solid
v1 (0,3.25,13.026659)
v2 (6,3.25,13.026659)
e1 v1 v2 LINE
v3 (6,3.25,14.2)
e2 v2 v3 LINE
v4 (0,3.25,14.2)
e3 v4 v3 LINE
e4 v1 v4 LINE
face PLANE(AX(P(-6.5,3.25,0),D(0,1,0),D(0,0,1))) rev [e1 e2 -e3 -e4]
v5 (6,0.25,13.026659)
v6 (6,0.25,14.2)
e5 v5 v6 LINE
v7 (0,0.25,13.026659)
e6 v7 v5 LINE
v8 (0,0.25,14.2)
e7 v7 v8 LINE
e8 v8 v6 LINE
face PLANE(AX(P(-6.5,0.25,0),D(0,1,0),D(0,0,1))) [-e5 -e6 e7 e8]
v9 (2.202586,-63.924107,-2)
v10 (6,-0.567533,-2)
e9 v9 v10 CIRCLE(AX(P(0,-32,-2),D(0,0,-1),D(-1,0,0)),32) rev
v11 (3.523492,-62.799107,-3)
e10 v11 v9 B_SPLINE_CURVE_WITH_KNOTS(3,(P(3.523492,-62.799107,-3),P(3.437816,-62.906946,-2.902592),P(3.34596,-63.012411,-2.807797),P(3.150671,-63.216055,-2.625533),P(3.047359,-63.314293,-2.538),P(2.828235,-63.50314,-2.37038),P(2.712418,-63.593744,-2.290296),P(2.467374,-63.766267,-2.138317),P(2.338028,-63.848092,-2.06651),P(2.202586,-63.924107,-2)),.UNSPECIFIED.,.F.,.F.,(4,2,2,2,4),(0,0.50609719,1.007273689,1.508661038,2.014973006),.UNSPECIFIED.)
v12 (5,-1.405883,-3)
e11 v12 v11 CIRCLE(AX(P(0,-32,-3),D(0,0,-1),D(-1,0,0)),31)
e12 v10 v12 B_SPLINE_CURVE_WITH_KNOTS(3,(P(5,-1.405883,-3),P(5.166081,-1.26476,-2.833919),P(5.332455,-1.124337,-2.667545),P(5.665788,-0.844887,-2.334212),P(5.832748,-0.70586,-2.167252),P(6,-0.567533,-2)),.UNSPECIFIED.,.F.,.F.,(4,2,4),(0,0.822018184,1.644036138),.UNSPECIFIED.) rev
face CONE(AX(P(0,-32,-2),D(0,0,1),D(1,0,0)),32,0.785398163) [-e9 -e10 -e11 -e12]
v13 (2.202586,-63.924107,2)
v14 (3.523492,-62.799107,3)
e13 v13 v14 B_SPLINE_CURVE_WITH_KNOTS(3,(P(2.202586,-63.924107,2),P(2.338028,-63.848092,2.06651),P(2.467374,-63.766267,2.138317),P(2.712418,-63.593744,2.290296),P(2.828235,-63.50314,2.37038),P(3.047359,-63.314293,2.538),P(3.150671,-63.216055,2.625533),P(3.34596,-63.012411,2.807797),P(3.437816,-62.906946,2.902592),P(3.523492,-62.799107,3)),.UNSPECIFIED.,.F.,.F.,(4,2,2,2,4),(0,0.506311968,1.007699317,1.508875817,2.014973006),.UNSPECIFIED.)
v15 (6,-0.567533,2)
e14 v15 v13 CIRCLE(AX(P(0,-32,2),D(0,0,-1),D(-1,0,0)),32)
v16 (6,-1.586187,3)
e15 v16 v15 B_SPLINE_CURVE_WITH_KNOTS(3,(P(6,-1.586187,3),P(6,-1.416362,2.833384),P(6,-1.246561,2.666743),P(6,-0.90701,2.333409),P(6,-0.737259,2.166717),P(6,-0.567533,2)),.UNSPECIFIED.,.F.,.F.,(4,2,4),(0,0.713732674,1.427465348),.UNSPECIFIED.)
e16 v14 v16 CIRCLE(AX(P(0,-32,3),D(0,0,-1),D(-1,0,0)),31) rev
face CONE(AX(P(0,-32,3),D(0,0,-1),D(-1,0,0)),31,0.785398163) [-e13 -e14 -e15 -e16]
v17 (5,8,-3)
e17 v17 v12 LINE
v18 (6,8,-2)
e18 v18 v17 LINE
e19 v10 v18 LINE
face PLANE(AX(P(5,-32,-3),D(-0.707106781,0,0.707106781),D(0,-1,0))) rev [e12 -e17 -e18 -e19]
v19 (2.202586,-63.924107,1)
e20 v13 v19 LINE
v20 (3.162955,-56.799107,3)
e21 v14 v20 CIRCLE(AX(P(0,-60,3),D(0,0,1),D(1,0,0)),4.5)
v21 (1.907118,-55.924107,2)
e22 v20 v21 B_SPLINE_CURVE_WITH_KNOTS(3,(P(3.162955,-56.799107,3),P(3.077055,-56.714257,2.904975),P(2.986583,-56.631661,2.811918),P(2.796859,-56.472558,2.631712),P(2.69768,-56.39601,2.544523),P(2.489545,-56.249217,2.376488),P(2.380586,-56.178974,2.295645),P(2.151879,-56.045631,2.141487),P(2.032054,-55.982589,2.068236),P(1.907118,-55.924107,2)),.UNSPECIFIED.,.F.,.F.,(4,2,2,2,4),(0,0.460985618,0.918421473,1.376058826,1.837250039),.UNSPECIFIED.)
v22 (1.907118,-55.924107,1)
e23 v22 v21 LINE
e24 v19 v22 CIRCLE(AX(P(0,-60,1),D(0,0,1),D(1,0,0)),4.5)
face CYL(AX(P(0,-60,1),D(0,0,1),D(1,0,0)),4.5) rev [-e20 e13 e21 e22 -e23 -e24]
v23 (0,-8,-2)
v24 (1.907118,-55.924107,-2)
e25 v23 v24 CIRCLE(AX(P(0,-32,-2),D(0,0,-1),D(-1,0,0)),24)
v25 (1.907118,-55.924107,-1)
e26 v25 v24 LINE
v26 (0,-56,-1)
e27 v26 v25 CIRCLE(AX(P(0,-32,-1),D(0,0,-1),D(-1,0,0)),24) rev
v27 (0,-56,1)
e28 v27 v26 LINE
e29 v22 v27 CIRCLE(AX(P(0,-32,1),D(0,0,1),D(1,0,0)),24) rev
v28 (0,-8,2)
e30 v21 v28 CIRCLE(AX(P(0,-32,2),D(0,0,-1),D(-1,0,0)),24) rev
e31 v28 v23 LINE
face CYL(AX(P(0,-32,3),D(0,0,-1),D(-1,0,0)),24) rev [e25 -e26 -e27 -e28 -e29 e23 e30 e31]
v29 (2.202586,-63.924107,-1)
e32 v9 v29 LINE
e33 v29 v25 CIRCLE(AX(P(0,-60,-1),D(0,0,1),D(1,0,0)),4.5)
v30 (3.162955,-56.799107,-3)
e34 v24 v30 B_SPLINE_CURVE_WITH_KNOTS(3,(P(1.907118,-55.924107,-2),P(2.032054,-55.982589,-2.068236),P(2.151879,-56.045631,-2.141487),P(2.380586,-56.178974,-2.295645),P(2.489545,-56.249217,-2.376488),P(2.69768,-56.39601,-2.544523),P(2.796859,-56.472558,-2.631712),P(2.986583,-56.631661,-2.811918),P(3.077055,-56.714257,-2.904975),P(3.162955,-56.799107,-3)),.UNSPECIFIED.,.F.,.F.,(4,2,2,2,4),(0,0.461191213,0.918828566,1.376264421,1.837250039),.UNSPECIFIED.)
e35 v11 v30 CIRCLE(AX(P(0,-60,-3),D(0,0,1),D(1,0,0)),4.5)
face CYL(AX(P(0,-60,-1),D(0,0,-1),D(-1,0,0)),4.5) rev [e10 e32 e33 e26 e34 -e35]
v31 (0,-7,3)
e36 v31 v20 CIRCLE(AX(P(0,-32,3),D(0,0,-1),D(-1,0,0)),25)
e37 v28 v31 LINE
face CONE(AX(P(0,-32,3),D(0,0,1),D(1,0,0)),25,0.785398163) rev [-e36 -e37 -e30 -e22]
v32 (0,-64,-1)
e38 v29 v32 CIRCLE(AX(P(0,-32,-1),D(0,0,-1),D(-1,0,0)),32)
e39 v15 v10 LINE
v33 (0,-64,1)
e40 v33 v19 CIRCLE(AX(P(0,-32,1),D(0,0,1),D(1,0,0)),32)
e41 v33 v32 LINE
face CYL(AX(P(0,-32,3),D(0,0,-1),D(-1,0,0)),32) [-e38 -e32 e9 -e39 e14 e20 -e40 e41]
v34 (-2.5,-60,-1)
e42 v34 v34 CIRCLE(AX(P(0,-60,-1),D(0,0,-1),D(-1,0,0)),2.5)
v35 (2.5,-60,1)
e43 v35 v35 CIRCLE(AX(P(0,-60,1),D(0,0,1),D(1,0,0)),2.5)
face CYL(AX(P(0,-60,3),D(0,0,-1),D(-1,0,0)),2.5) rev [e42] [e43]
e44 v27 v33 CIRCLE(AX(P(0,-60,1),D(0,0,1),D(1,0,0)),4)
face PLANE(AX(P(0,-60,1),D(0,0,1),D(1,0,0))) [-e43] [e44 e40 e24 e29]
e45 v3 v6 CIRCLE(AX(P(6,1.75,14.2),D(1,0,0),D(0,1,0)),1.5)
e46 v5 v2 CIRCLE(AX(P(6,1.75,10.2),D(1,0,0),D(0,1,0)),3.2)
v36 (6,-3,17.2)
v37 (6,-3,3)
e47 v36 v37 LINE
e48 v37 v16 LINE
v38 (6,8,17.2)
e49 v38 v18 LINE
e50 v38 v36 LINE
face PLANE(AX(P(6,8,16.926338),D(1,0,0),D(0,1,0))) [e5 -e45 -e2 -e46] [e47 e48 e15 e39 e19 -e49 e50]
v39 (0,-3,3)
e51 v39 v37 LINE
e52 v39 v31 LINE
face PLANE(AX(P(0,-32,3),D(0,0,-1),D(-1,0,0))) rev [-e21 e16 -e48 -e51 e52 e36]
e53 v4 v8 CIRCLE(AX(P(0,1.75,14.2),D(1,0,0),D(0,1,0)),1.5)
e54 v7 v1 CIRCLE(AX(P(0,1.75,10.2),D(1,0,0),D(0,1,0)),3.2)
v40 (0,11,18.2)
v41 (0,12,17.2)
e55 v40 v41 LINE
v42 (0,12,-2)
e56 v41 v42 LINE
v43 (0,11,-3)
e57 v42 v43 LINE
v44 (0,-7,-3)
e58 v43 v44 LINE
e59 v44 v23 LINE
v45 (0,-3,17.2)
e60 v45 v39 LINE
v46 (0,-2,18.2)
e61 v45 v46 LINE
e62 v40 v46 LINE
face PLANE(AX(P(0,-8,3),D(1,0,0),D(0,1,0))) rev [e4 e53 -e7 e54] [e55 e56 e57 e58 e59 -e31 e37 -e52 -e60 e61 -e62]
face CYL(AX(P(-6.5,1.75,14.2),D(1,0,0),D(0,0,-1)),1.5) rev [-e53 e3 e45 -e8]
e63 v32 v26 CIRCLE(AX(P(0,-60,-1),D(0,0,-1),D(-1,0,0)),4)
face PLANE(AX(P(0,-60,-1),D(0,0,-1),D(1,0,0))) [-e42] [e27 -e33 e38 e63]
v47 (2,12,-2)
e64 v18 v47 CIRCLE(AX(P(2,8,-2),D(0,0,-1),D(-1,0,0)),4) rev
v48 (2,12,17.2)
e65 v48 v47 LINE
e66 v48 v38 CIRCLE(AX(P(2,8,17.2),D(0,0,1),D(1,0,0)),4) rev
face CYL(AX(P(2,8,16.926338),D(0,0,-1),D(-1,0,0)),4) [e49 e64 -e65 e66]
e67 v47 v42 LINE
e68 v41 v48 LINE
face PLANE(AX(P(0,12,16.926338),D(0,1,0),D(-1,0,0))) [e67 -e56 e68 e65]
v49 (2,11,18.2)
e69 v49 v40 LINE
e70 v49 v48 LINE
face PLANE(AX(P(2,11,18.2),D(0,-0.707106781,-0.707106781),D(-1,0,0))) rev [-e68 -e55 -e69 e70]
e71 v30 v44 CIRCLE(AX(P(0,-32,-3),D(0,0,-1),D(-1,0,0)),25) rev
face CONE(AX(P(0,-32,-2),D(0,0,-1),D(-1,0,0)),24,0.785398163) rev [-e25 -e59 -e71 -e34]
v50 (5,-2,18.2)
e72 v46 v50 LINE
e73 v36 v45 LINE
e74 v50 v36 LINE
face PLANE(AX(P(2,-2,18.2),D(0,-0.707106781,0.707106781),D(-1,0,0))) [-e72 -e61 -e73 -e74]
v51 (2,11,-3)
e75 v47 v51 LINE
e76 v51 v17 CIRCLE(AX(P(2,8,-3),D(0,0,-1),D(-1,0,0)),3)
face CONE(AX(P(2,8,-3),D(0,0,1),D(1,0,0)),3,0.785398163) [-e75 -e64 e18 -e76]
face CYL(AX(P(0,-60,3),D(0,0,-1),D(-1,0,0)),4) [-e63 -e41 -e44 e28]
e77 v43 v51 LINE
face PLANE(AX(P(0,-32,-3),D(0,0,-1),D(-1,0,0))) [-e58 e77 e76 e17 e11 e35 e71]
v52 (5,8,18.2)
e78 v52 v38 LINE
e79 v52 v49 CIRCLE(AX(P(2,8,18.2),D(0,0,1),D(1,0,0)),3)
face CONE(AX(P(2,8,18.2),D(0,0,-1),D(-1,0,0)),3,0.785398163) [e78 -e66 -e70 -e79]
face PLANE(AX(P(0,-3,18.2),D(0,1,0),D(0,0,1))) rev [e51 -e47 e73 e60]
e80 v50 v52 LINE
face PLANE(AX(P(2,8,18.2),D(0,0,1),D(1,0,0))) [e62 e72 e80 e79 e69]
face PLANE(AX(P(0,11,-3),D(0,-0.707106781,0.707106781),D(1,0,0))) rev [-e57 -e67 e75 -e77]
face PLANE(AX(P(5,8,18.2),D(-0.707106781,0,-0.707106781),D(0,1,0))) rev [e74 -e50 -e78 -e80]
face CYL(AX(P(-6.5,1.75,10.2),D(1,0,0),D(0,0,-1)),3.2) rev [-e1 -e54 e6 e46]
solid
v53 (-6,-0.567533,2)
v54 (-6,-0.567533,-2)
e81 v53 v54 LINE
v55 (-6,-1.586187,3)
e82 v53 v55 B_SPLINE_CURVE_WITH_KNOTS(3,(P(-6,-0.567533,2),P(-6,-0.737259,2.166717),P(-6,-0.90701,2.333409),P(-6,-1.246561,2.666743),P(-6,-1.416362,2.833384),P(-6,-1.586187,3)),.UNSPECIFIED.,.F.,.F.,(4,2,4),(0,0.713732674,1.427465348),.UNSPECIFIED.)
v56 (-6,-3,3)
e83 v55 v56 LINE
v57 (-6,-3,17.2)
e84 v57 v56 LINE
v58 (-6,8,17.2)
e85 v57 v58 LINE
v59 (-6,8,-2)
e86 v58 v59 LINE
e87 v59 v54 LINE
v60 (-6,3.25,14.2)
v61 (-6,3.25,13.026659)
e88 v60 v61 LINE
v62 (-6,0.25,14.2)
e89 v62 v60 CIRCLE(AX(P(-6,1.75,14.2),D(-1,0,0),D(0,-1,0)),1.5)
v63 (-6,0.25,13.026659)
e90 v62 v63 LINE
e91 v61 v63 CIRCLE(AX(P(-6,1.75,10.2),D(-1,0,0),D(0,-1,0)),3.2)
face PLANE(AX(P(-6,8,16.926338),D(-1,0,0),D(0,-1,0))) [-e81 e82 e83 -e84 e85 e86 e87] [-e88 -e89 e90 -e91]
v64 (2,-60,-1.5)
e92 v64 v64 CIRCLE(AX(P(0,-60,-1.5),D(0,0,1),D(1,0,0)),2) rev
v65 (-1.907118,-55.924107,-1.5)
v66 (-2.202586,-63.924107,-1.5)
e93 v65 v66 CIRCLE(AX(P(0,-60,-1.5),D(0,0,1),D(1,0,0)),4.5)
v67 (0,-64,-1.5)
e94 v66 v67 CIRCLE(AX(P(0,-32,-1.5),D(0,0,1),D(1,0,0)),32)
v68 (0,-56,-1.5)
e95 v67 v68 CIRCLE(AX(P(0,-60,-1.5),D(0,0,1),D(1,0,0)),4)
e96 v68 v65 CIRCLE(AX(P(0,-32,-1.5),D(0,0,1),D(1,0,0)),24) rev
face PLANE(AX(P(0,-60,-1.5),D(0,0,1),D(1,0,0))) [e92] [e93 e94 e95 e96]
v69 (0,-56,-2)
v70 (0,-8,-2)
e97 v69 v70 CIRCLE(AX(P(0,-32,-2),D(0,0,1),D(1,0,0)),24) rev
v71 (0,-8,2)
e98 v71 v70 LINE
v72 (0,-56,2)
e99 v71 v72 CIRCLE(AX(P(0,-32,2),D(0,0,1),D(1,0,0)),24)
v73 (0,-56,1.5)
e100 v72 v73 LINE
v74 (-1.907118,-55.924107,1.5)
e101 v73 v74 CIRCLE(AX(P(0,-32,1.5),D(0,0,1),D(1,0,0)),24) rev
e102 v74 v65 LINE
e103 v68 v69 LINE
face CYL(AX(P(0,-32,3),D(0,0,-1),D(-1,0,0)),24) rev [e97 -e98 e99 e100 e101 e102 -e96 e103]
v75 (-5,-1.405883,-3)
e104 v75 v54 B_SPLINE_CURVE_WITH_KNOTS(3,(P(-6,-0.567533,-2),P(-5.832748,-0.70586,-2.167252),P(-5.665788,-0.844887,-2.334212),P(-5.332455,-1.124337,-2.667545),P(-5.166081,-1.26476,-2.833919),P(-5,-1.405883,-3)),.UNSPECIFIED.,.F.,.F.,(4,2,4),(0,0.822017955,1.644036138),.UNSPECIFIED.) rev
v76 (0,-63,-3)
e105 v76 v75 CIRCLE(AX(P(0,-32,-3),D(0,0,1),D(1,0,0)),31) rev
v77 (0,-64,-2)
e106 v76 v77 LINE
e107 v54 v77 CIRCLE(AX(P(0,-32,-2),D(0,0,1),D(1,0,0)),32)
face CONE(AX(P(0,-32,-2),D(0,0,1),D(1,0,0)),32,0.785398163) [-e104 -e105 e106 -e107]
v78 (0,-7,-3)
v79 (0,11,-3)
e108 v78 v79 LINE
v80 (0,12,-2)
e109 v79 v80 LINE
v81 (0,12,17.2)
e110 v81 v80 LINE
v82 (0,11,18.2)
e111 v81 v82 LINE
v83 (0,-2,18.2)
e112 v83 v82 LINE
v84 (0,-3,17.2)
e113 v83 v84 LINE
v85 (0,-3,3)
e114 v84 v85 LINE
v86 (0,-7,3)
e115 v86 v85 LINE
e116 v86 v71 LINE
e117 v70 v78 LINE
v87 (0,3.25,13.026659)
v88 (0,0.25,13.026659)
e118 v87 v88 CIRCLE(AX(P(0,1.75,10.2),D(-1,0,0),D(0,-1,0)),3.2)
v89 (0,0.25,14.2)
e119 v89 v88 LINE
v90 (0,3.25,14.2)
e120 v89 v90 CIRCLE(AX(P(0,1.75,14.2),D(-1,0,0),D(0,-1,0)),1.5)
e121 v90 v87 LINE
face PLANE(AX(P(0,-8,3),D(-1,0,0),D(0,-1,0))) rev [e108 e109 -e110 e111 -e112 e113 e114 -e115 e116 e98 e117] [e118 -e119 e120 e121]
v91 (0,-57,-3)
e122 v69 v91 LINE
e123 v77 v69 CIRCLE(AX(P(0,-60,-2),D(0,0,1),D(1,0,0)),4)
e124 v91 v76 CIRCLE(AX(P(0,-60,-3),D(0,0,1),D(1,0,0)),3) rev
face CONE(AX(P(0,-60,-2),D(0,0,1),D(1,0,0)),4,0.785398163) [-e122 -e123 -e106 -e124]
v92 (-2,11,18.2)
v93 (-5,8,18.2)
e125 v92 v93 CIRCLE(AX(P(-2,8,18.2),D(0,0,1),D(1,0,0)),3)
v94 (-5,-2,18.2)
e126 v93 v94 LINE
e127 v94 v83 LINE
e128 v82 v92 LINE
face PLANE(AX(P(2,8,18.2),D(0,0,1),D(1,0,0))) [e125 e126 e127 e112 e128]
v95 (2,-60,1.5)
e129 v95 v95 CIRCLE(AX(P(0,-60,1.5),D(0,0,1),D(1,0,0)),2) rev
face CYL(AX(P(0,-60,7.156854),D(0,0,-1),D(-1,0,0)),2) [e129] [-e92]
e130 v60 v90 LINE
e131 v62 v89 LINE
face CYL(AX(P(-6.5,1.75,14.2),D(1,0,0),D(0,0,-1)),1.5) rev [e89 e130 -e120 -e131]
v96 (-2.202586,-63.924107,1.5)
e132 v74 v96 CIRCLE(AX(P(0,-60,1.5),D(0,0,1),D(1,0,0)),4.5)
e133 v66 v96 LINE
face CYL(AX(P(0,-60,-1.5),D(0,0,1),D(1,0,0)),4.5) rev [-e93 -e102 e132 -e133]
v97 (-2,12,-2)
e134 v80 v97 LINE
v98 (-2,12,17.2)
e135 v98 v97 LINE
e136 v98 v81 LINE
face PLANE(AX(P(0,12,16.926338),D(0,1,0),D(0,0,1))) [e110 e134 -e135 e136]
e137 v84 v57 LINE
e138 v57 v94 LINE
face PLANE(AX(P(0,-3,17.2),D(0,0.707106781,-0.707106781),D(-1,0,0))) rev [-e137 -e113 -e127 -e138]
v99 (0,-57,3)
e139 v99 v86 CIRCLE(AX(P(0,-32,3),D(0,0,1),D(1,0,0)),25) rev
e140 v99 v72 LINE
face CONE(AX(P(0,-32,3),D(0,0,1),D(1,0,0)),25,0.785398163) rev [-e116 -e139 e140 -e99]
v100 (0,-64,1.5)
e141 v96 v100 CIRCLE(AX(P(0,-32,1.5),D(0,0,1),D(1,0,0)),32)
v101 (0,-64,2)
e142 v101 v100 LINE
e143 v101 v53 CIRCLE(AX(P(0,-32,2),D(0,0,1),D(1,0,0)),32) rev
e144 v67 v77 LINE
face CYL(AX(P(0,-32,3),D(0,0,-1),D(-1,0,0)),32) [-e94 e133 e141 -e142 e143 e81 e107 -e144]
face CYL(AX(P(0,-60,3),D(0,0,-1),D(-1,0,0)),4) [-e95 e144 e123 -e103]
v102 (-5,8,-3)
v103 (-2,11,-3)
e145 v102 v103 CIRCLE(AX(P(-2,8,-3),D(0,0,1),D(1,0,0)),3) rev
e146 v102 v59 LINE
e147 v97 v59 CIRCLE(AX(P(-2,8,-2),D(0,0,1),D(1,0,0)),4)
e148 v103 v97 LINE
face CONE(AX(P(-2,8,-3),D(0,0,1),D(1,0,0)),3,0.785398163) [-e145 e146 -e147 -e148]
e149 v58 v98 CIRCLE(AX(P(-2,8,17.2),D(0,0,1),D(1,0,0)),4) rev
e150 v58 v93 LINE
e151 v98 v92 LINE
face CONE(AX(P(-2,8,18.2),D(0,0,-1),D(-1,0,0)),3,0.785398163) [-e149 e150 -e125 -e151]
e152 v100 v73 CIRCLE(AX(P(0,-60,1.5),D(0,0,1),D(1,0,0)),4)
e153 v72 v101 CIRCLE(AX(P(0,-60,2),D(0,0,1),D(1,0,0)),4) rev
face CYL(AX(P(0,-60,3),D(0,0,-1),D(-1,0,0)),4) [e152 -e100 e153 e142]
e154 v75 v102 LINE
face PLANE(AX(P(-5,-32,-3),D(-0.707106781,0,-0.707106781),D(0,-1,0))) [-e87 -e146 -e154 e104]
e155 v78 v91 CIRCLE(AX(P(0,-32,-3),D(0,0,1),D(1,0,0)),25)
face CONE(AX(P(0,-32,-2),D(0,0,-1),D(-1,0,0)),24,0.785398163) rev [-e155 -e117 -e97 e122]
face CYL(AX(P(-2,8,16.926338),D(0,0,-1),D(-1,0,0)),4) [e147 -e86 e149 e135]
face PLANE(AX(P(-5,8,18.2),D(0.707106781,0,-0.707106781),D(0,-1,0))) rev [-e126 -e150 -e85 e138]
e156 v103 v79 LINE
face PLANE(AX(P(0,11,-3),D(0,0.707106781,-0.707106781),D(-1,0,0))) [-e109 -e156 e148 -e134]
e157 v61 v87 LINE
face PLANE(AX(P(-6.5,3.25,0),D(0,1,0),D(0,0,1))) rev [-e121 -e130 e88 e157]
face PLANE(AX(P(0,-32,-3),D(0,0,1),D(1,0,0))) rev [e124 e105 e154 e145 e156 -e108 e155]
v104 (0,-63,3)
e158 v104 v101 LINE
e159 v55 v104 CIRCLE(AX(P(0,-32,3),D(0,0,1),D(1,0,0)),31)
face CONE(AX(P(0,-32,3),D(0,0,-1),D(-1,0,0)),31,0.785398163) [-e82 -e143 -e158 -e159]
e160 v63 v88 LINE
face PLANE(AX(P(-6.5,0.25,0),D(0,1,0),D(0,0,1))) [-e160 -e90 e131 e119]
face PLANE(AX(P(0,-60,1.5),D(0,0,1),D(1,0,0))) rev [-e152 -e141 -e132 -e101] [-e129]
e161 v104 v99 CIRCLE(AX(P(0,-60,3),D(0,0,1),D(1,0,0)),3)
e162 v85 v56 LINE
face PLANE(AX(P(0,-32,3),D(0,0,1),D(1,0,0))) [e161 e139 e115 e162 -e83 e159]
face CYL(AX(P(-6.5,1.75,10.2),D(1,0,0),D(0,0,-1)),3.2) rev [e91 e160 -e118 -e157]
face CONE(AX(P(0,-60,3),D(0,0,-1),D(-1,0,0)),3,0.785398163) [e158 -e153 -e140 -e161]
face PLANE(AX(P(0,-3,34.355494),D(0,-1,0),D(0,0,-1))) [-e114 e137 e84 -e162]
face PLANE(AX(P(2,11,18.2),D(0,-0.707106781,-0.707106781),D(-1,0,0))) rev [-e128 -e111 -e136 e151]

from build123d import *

# Parameters (mm, degrees)
AUFSATZ_LINEAR_AUSTRAGEN1_DEPTH             = 3
SKIZZE2_R                                   = 4.5
SCHNITT_LINEAR_AUSTRAGEN1_DEPTH             = 1.5
AUFSATZ_LINEAR_AUSTRAGEN2_REACH             = 73.617
SKIZZE3_R                                   = 2
AUFSATZ_LINEAR_AUSTRAGEN2_DIRECTION_2_REACH = 73.617
SKIZZE4_R                                   = 2.5
AUFSATZ_LINEAR_AUSTRAGEN4_DEPTH             = 3
SKIZZE5_R                                   = 4.5
SCHNITT_LINEAR_AUSTRAGEN2_DEPTH             = 2
AUFSATZ_LINEAR_START                        = -6
AUFSATZ_LINEAR_AUSTRAGEN5_DEPTH             = 6
AUFSATZ_LINEAR_AUSTRAGEN6_DEPTH             = 6
AUFSATZ_LINEAR_AUSTRAGEN7_DEPTH             = 15.2
AUFSATZ_LINEAR_START_2                      = 15.2
AUFSATZ_LINEAR_AUSTRAGEN9_DEPTH             = 15.2
SCHNITT_LINEAR_AUSTRAGEN3_DEPTH             = 6.5
FASE1_SIZE                                  = 1
FASE2_SIZE                                  = 1
FASE3_SIZE                                  = 1
FASE4_SIZE                                  = 1
FASE5_SIZE                                  = 1
FASE6_SIZE                                  = 1


# Some blends are built 0.0001 mm under size
with BuildPart() as part:
    # Skizze1 → Aufsatz-Linear austragen1 (new, symmetric)
    with BuildSketch(Plane.XY):
        with BuildLine():
            Line((0, -8), (0, 0))
            ThreePointArc((0, 0), (-32, -32), (0, -64))
            ThreePointArc((0, -64), (4, -60), (0, -56))
            ThreePointArc((0, -56), (-24, -32), (0, -8))
        make_face()
    extrude(amount=AUFSATZ_LINEAR_AUSTRAGEN1_DEPTH, both=True)

    # Skizze2 → Schnitt-Linear austragen1 (cut, symmetric)
    with BuildSketch(Plane.XY):
        with Locations((0, -60)):
            Circle(SKIZZE2_R)
    extrude(amount=SCHNITT_LINEAR_AUSTRAGEN1_DEPTH, both=True, mode=Mode.SUBTRACT)

    # Aufsatz-Linear austragen2: up to this face of the body (flat: up to its plane)
    aufsatz_linear_austragen2_end = Plane(part.part.faces().sort_by_distance((-0.306004635, -59.992467517, 1.5))[0])
    # Skizze3 → Aufsatz-Linear austragen2 (add, up to the picked face)
    with BuildSketch(Plane.XY, mode=Mode.PRIVATE) as aufsatz_linear_austragen2_sk1:
        with Locations((0, -60)):
            Circle(SKIZZE3_R)
    aufsatz_linear_austragen2_tool1 = split(extrude(aufsatz_linear_austragen2_sk1.sketch, amount=AUFSATZ_LINEAR_AUSTRAGEN2_REACH, mode=Mode.PRIVATE), bisect_by=aufsatz_linear_austragen2_end, keep=Keep.BOTH, mode=Mode.PRIVATE)
    add(aufsatz_linear_austragen2_tool1.solids().sort_by(Axis((0, -60, 0), (0, 0, 1)))[0])

    # Aufsatz-Linear austragen2 direction 2: up to this face of the body (flat: up to its plane)
    aufsatz_linear_austragen2_direction_2_end = Plane(part.part.faces().sort_by_distance((-0.306004635, -59.992467517, -1.5))[0])
    # Skizze3 → Aufsatz-Linear austragen2 direction 2 (add, up to the picked face)
    with BuildSketch(Plane.XY, mode=Mode.PRIVATE) as aufsatz_linear_austragen2_direction_2_sk1:
        with Locations((0, -60)):
            Circle(SKIZZE3_R)
    aufsatz_linear_austragen2_direction_2_tool1 = split(extrude(aufsatz_linear_austragen2_direction_2_sk1.sketch, amount=-AUFSATZ_LINEAR_AUSTRAGEN2_DIRECTION_2_REACH, mode=Mode.PRIVATE), bisect_by=aufsatz_linear_austragen2_direction_2_end, keep=Keep.BOTH, mode=Mode.PRIVATE)
    add(aufsatz_linear_austragen2_direction_2_tool1.solids().sort_by(Axis((0, -60, 0), (0, 0, -1)))[0])

    # Skizze7 → Aufsatz-Linear austragen6 (add)
    with BuildSketch(Plane(origin=(0, 0, -3), x_dir=(-1, 0, 0), z_dir=(0, 0, -1)).offset(AUFSATZ_LINEAR_START)):
        with BuildLine():
            Line((0, 0), (0, 12))
            Line((0, 12), (2, 12))
            ThreePointArc((2, 12), (4.828427125, 10.828427125), (6, 8))
            Line((6, 8), (6, -0.567532709))
            ThreePointArc((6, -0.567532709), (3.013390672, -0.142199124), (0, 0))
        make_face()
    extrude(amount=AUFSATZ_LINEAR_AUSTRAGEN6_DEPTH)

    # Skizze9 → Aufsatz-Linear austragen9 (add)
    with BuildSketch(Plane.XY.offset(3).offset(AUFSATZ_LINEAR_START_2)):
        with BuildLine():
            Line((-6, -3), (0, -3))
            Line((0, -3), (0, 12))
            Line((0, 12), (-2, 12))
            ThreePointArc((-2, 12), (-4.828427125, 10.828427125), (-6, 8))
            Line((-6, 8), (-6, -0.567532709))
            Line((-6, -0.567532709), (-6, -3))
        make_face()
    extrude(amount=-AUFSATZ_LINEAR_AUSTRAGEN9_DEPTH)


with BuildPart() as body_2:
    # Skizze4 → Aufsatz-Linear austragen4 (new, symmetric)
    with BuildSketch(Plane.XY):
        with BuildLine():
            Line((0, -8), (0, 0))
            ThreePointArc((0, 0), (32, -32), (0, -64))
            ThreePointArc((0, -64), (-4, -60), (0, -56))
            ThreePointArc((0, -56), (24, -32), (0, -8))
        make_face()
        with Locations((0, -60)):
            Circle(SKIZZE4_R, mode=Mode.SUBTRACT)
    extrude(amount=AUFSATZ_LINEAR_AUSTRAGEN4_DEPTH, both=True)

    # Skizze5 → Schnitt-Linear austragen2 (cut)
    with BuildSketch(Plane.XY.offset(3)):
        with Locations((0, -60)):
            Circle(SKIZZE5_R)
    schnitt_linear_austragen2 = extrude(amount=-SCHNITT_LINEAR_AUSTRAGEN2_DEPTH, mode=Mode.SUBTRACT)

    # Spiegeln1: Schnitt-Linear austragen2 across plane
    add(schnitt_linear_austragen2.mirror(Plane.XY), mode=Mode.SUBTRACT)

    # Skizze6 → Aufsatz-Linear austragen5 (add)
    with BuildSketch(Plane(origin=(0, 0, -3), x_dir=(-1, 0, 0), z_dir=(0, 0, -1)).offset(AUFSATZ_LINEAR_START)):
        with BuildLine():
            Line((0, 0), (0, 12))
            Line((0, 12), (-2, 12))
            ThreePointArc((-2, 12), (-4.828427125, 10.828427125), (-6, 8))
            Line((-6, 8), (-6, -0.567532709))
            ThreePointArc((-6, -0.567532709), (-3.013390672, -0.142199124), (0, 0))
        make_face()
    extrude(amount=AUFSATZ_LINEAR_AUSTRAGEN5_DEPTH)

    # Skizze8 → Aufsatz-Linear austragen7 (add)
    with BuildSketch(Plane.XY.offset(3)):
        with BuildLine():
            Line((0, -3), (6, -3))
            Line((6, -3), (6, 8))
            ThreePointArc((6, 8), (4.828427125, 10.828427125), (2, 12))
            Line((2, 12), (0, 12))
            Line((0, 12), (0, -3))
        make_face()
    extrude(amount=AUFSATZ_LINEAR_AUSTRAGEN7_DEPTH)


with BuildPart() as schnitt_linear_austragen3_tool:
    # Skizze10 → Schnitt-Linear austragen3 (new, symmetric)
    with BuildSketch(Plane(origin=(0, 0, 0), x_dir=(0, 0, -1), z_dir=(1, 0, 0))):
        with BuildLine():
            Line((-14.2, 0.25), (-13.026658805, 0.25))
            ThreePointArc((-13.026658805, 0.25), (-7, 1.75), (-13.026658805, 3.25))
            Line((-13.026658805, 3.25), (-14.2, 3.25))
            ThreePointArc((-14.2, 3.25), (-15.7, 1.75), (-14.2, 0.25))
        make_face()
    extrude(amount=SCHNITT_LINEAR_AUSTRAGEN3_DEPTH, both=True)


with BuildPart() as part_1:
    add(part.part)

    # Schnitt-Linear austragen3: cut by schnitt_linear_austragen3_tool
    add(schnitt_linear_austragen3_tool.part, mode=Mode.SUBTRACT)

    # Fase2
    # the kernel refuses this chamfer: 1 mm, written as the material it takes off along each edge
    with BuildSketch(Plane(origin=(0, -32, 3), x_dir=(0.10711985504033346, -0.9942461147302201, 0), z_dir=(0.9942461147302201, 0.10711985504033346, 0))) as fase2_piece_1:
        Polygon((24, FASE2_SIZE), (24 + FASE2_SIZE, 0), (24, 0), align=None)
    revolve(axis=Axis((0, -32, 3), (0, 0, -1)), revolution_arc=192.298628552, mode=Mode.SUBTRACT)
    with BuildSketch(Plane(origin=(0, -32, -3), x_dir=(0.10711985504033346, -0.9942461147302201, 0), z_dir=(0.9942461147302201, 0.10711985504033346, 0))) as fase2_piece_2:
        Polygon((24, -FASE2_SIZE), (24 + FASE2_SIZE, 0), (24, 0), align=None)
    revolve(axis=Axis((0, -32, -3), (0, 0, -1)), revolution_arc=192.298628552, mode=Mode.SUBTRACT)

    # Fase4
    fase4_edges = [part_1.edges().sort_by_distance(p)[0] for p in [
        (-31.857800876, -35.013390672, 3),
        (-31.857800876, -35.013390672, -3),
        (3.774917218, -61.322875656, 3),
        (-1, 12, -3),
        (-4.828427125, 10.828427125, -3),
        (3.774917218, -61.322875656, -3),
        (-6, 3.716233646, -3),
    ]]
    chamfer(fase4_edges, length=FASE4_SIZE - 0.0001)  # a hair under: the kernel refuses the full size

    # Fase6
    fase6_edges = [part_1.edges().sort_by_distance(p)[0] for p in [
        (-3, -3, 18.2),
        (-4.828427125, 10.828427125, 18.2),
        (-6, 2.5, 18.2),
        (-1, 12, 18.2),
    ]]
    chamfer(fase6_edges, length=FASE6_SIZE)


with BuildPart() as body_2_1:
    add(body_2.part)

    # Schnitt-Linear austragen3: cut by schnitt_linear_austragen3_tool
    add(schnitt_linear_austragen3_tool.part, mode=Mode.SUBTRACT)

    # Fase1
    fase1_edges = [body_2_1.edges().sort_by_distance(p)[0] for p in [
        (23.98101928, -31.045686485, 3),
        (23.98101928, -31.045686485, -3),
    ]]
    chamfer(fase1_edges, length=FASE1_SIZE)

    # Fase3
    fase3_edges = [body_2_1.edges().sort_by_distance(p)[0] for p in [
        (31.942674958, -33.914553878, 3),
        (31.942674958, -33.914553878, -3),
        (1, 12, -3),
        (4.828427125, 10.828427125, -3),
        (6, 3.716233646, -3),
    ]]
    chamfer(fase3_edges, length=FASE3_SIZE)

    # Fase5
    fase5_edges = [body_2_1.edges().sort_by_distance(p)[0] for p in [
        (3, -3, 18.2),
        (6, 2.5, 18.2),
        (4.828427125, 10.828427125, 18.2),
        (1, 12, 18.2),
    ]]
    chamfer(fase5_edges, length=FASE5_SIZE)


solid = Compound([part_1.part, body_2_1.part])
